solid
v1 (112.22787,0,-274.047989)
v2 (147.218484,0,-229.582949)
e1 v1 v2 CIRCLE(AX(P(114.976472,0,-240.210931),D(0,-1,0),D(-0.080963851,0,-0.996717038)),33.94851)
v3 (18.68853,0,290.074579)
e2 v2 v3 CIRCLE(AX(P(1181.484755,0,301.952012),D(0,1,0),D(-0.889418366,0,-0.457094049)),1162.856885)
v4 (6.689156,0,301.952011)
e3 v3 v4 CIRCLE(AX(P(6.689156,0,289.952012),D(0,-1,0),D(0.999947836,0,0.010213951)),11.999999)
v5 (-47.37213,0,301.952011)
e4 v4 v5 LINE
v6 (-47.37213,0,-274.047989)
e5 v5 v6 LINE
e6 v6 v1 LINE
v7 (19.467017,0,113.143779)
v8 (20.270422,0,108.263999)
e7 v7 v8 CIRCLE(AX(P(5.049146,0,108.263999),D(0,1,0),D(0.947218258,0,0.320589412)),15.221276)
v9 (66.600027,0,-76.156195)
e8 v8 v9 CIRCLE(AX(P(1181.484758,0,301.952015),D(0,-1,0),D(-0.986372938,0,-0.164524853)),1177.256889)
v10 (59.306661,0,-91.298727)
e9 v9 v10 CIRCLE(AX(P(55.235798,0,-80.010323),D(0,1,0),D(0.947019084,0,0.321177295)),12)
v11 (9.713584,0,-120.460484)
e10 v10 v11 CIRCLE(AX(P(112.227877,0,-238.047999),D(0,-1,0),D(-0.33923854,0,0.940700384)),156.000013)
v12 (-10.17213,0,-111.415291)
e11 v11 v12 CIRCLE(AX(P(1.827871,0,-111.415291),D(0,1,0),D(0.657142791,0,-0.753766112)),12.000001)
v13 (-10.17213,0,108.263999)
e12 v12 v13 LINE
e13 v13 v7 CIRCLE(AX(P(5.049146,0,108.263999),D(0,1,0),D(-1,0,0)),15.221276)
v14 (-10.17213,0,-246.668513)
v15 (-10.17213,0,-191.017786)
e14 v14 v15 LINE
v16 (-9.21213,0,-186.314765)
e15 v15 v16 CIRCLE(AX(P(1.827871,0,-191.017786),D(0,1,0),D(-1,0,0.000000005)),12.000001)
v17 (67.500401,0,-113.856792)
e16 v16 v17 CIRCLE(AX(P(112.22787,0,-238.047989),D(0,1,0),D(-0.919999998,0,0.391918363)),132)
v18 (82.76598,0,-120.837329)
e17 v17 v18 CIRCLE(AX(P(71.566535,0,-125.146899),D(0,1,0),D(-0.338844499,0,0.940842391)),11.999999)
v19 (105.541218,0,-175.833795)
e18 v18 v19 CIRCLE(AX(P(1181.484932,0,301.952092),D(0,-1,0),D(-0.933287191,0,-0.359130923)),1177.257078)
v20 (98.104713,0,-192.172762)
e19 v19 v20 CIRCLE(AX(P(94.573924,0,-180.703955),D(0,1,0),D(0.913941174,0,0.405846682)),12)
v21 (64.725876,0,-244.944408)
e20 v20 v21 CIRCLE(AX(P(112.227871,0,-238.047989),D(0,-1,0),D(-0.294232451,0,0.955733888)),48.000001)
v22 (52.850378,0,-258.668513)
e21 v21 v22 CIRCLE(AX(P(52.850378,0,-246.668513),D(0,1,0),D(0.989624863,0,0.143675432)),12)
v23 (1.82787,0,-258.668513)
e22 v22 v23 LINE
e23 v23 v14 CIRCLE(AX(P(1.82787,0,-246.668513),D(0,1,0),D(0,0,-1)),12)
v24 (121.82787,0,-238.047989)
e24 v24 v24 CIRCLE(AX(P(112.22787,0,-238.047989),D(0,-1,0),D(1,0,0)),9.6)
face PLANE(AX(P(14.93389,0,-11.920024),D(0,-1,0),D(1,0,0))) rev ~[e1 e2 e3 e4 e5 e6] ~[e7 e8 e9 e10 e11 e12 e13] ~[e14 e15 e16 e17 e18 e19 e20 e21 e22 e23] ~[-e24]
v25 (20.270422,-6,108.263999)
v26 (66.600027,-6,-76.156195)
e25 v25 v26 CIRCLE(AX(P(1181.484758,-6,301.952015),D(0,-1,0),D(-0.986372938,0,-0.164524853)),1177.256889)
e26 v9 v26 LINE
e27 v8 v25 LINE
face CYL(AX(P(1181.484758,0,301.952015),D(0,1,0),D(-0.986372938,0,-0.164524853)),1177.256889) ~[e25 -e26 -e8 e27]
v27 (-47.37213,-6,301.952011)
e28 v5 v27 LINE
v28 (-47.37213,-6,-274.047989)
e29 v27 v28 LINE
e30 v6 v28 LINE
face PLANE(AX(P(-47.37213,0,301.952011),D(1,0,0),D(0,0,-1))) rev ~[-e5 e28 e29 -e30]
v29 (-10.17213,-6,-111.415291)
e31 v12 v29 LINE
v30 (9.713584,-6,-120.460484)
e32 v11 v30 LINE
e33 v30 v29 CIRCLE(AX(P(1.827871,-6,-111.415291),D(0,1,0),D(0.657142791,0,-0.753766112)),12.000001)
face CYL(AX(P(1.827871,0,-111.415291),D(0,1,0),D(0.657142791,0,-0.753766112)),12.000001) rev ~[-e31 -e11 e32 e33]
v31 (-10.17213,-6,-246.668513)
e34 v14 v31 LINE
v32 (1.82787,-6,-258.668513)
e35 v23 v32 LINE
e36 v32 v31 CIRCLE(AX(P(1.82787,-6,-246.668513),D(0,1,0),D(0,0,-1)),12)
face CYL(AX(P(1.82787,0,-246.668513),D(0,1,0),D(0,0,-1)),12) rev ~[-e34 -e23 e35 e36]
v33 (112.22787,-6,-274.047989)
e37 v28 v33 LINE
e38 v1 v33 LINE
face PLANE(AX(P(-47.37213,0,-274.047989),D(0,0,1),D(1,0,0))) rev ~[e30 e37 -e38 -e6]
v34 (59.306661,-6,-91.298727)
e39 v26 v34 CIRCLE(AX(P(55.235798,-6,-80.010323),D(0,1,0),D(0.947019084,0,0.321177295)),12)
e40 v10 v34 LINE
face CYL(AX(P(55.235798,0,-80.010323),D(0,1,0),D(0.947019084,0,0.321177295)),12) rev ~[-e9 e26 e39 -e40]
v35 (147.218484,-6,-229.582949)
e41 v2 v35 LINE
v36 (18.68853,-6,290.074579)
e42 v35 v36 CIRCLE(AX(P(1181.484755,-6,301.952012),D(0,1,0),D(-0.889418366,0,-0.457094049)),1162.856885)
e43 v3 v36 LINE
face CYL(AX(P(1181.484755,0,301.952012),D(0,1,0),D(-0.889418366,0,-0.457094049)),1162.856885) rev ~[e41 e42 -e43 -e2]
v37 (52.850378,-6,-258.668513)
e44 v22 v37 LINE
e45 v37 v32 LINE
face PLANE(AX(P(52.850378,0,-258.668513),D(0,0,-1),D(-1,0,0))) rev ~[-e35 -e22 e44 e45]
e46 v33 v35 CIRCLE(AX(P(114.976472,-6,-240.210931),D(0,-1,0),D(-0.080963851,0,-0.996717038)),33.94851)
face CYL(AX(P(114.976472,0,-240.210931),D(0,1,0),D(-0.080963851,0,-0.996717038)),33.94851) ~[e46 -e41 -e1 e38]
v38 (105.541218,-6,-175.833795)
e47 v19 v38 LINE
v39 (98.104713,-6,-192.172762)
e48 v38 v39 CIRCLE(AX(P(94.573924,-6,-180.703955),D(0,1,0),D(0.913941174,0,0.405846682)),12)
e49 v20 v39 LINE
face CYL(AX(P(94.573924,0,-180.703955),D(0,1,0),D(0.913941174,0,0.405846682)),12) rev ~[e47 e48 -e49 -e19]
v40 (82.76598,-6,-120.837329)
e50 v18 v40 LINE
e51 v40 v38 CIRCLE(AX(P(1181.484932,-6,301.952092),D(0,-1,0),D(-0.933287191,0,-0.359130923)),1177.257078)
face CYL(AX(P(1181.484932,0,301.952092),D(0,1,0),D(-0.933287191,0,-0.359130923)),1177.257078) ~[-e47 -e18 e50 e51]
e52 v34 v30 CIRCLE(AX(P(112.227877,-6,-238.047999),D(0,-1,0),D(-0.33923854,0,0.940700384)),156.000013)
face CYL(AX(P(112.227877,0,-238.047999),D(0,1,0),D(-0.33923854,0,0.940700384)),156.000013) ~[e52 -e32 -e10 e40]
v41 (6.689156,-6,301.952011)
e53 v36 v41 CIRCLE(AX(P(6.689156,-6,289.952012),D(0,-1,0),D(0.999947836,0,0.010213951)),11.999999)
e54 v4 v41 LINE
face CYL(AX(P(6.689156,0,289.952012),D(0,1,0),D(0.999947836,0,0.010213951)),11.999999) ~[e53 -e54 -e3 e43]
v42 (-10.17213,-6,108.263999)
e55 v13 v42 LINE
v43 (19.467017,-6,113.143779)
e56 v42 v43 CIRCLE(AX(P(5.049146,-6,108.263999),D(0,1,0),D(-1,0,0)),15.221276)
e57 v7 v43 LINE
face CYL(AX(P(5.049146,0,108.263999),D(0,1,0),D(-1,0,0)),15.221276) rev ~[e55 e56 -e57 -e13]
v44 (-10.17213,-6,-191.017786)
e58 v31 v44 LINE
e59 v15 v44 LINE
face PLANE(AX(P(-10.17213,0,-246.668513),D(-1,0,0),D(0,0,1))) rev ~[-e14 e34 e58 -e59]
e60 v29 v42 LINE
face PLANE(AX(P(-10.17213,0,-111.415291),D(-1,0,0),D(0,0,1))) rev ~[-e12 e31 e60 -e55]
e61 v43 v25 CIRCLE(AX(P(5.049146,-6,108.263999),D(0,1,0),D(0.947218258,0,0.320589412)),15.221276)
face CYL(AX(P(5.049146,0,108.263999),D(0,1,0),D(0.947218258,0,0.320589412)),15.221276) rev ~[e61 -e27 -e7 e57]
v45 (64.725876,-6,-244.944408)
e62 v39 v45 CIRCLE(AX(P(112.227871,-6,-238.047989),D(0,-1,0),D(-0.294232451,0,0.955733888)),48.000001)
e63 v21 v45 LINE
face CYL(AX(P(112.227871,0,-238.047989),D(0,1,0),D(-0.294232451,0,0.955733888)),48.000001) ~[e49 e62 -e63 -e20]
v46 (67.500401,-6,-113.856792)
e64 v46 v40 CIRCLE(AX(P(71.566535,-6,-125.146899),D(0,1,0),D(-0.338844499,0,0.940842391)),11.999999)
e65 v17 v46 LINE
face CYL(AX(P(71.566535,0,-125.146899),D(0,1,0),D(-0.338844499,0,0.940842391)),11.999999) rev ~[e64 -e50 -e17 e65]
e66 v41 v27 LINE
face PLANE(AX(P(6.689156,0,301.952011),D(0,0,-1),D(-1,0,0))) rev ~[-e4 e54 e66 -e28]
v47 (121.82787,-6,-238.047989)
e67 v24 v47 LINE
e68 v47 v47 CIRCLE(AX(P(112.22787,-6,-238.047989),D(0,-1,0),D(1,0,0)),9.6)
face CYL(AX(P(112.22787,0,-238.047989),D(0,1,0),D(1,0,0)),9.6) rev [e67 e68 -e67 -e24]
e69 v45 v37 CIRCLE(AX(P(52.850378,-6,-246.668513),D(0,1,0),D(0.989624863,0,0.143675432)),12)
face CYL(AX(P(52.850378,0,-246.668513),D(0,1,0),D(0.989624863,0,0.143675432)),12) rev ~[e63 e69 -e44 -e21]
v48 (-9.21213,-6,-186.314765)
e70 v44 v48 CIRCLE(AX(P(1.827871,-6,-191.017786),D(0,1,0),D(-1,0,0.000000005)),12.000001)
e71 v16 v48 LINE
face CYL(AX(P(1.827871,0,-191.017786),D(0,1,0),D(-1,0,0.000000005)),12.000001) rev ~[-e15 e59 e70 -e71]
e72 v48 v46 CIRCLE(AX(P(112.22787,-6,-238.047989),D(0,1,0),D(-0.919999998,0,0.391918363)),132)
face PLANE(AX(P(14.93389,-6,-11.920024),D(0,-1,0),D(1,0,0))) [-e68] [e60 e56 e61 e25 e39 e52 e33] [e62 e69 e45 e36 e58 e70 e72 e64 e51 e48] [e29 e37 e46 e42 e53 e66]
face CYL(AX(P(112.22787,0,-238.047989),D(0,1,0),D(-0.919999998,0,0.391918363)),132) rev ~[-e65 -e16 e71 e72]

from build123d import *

# Parameters (mm, degrees)
F0_R     = 9.6
F1_DEPTH = 6


# Not quite as in the source:
# - ends of sketch curves that miss each other by under 0.0002 mm in the source are joined


with BuildPart() as f1:
    # F0 (on Front) → F1 (new body)
    with BuildSketch(Plane.XZ):
        with BuildLine():
            Line((-47.37213, 301.952011), (-47.37213, -274.047989))
            Line((-47.37213, -274.047989), (112.22787, -274.047989))
            ThreePointArc((112.22787, -274.047989), (141.6551199022, -261.2050030869), (147.2184839386, -229.5829493499))
            ThreePointArc((147.2184839386, -229.5829493499), (52.6438052156, 22.7491379249), (18.6885296881, 290.0745789968))
            ThreePointArc((18.6885296881, 290.0745789968), (15.1309918192, 298.4805166136), (6.689156, 301.952011))
            Line((6.689156, 301.952011), (-47.37213, 301.952011))
        make_face()
        with BuildLine():
            ThreePointArc((-9.212129772, -186.3147650971), (21.5887703345, -142.086780109), (67.5004011846, -113.8567915125))
            ThreePointArc((67.5004011846, -113.8567915125), (76.5568264391, -114.2337436567), (82.7659804046, -120.8373292291))
            ThreePointArc((82.7659804046, -120.8373292291), (93.8059444216, -148.4795335524), (105.5412180684, -175.8337949696))
            ThreePointArc((105.5412180684, -175.8337949696), (105.4958772539, -185.674964668), (98.1047129391, -192.1727618023))
            ThreePointArc((98.1047129391, -192.1727618023), (71.6615483985, -212.3891980752), (64.7258762989, -244.9444079566))
            ThreePointArc((64.7258762989, -244.9444079566), (61.9247722129, -254.5206063304), (52.850378, -258.668513))
            Line((52.850378, -258.668513), (1.82787, -258.668513))
            ThreePointArc((1.82787, -258.668513), (-6.6574113742, -255.1537943742), (-10.17213, -246.668513))
            Line((-10.17213, -246.668513), (-10.17213, -191.017786))
            ThreePointArc((-10.17213, -191.017786), (-9.9296807015, -188.6177856873), (-9.212129772, -186.3147650971))
        make_face(mode=Mode.SUBTRACT)
        with BuildLine():
            ThreePointArc((19.4670165424, 113.1437789224), (20.0682276951, 110.7367359664), (20.270422, 108.263999))
            ThreePointArc((20.270422, 108.263999), (39.7056889327, 15.1169768951), (66.6000271064, -76.1561949639))
            ThreePointArc((66.6000271064, -76.1561949639), (66.0471154967, -85.2175692958), (59.3066608161, -91.2987274901))
            ThreePointArc((59.3066608161, -91.2987274901), (33.1541685391, -103.5736429809), (9.7135843501, -120.4604844016))
            ThreePointArc((9.7135843501, -120.4604844016), (-3.1406022278, -122.3383987868), (-10.17213, -111.415291))
            Line((-10.17213, -111.415291), (-10.17213, 108.263999))
            ThreePointArc((-10.17213, 108.263999), (2.5764090336, 123.2830806951), (19.4670165424, 113.1437789224))
        make_face(mode=Mode.SUBTRACT)
        with Locations((112.22787, -238.047989)):
            Circle(F0_R, mode=Mode.SUBTRACT)
    extrude(amount=F1_DEPTH)


solid = f1.part
